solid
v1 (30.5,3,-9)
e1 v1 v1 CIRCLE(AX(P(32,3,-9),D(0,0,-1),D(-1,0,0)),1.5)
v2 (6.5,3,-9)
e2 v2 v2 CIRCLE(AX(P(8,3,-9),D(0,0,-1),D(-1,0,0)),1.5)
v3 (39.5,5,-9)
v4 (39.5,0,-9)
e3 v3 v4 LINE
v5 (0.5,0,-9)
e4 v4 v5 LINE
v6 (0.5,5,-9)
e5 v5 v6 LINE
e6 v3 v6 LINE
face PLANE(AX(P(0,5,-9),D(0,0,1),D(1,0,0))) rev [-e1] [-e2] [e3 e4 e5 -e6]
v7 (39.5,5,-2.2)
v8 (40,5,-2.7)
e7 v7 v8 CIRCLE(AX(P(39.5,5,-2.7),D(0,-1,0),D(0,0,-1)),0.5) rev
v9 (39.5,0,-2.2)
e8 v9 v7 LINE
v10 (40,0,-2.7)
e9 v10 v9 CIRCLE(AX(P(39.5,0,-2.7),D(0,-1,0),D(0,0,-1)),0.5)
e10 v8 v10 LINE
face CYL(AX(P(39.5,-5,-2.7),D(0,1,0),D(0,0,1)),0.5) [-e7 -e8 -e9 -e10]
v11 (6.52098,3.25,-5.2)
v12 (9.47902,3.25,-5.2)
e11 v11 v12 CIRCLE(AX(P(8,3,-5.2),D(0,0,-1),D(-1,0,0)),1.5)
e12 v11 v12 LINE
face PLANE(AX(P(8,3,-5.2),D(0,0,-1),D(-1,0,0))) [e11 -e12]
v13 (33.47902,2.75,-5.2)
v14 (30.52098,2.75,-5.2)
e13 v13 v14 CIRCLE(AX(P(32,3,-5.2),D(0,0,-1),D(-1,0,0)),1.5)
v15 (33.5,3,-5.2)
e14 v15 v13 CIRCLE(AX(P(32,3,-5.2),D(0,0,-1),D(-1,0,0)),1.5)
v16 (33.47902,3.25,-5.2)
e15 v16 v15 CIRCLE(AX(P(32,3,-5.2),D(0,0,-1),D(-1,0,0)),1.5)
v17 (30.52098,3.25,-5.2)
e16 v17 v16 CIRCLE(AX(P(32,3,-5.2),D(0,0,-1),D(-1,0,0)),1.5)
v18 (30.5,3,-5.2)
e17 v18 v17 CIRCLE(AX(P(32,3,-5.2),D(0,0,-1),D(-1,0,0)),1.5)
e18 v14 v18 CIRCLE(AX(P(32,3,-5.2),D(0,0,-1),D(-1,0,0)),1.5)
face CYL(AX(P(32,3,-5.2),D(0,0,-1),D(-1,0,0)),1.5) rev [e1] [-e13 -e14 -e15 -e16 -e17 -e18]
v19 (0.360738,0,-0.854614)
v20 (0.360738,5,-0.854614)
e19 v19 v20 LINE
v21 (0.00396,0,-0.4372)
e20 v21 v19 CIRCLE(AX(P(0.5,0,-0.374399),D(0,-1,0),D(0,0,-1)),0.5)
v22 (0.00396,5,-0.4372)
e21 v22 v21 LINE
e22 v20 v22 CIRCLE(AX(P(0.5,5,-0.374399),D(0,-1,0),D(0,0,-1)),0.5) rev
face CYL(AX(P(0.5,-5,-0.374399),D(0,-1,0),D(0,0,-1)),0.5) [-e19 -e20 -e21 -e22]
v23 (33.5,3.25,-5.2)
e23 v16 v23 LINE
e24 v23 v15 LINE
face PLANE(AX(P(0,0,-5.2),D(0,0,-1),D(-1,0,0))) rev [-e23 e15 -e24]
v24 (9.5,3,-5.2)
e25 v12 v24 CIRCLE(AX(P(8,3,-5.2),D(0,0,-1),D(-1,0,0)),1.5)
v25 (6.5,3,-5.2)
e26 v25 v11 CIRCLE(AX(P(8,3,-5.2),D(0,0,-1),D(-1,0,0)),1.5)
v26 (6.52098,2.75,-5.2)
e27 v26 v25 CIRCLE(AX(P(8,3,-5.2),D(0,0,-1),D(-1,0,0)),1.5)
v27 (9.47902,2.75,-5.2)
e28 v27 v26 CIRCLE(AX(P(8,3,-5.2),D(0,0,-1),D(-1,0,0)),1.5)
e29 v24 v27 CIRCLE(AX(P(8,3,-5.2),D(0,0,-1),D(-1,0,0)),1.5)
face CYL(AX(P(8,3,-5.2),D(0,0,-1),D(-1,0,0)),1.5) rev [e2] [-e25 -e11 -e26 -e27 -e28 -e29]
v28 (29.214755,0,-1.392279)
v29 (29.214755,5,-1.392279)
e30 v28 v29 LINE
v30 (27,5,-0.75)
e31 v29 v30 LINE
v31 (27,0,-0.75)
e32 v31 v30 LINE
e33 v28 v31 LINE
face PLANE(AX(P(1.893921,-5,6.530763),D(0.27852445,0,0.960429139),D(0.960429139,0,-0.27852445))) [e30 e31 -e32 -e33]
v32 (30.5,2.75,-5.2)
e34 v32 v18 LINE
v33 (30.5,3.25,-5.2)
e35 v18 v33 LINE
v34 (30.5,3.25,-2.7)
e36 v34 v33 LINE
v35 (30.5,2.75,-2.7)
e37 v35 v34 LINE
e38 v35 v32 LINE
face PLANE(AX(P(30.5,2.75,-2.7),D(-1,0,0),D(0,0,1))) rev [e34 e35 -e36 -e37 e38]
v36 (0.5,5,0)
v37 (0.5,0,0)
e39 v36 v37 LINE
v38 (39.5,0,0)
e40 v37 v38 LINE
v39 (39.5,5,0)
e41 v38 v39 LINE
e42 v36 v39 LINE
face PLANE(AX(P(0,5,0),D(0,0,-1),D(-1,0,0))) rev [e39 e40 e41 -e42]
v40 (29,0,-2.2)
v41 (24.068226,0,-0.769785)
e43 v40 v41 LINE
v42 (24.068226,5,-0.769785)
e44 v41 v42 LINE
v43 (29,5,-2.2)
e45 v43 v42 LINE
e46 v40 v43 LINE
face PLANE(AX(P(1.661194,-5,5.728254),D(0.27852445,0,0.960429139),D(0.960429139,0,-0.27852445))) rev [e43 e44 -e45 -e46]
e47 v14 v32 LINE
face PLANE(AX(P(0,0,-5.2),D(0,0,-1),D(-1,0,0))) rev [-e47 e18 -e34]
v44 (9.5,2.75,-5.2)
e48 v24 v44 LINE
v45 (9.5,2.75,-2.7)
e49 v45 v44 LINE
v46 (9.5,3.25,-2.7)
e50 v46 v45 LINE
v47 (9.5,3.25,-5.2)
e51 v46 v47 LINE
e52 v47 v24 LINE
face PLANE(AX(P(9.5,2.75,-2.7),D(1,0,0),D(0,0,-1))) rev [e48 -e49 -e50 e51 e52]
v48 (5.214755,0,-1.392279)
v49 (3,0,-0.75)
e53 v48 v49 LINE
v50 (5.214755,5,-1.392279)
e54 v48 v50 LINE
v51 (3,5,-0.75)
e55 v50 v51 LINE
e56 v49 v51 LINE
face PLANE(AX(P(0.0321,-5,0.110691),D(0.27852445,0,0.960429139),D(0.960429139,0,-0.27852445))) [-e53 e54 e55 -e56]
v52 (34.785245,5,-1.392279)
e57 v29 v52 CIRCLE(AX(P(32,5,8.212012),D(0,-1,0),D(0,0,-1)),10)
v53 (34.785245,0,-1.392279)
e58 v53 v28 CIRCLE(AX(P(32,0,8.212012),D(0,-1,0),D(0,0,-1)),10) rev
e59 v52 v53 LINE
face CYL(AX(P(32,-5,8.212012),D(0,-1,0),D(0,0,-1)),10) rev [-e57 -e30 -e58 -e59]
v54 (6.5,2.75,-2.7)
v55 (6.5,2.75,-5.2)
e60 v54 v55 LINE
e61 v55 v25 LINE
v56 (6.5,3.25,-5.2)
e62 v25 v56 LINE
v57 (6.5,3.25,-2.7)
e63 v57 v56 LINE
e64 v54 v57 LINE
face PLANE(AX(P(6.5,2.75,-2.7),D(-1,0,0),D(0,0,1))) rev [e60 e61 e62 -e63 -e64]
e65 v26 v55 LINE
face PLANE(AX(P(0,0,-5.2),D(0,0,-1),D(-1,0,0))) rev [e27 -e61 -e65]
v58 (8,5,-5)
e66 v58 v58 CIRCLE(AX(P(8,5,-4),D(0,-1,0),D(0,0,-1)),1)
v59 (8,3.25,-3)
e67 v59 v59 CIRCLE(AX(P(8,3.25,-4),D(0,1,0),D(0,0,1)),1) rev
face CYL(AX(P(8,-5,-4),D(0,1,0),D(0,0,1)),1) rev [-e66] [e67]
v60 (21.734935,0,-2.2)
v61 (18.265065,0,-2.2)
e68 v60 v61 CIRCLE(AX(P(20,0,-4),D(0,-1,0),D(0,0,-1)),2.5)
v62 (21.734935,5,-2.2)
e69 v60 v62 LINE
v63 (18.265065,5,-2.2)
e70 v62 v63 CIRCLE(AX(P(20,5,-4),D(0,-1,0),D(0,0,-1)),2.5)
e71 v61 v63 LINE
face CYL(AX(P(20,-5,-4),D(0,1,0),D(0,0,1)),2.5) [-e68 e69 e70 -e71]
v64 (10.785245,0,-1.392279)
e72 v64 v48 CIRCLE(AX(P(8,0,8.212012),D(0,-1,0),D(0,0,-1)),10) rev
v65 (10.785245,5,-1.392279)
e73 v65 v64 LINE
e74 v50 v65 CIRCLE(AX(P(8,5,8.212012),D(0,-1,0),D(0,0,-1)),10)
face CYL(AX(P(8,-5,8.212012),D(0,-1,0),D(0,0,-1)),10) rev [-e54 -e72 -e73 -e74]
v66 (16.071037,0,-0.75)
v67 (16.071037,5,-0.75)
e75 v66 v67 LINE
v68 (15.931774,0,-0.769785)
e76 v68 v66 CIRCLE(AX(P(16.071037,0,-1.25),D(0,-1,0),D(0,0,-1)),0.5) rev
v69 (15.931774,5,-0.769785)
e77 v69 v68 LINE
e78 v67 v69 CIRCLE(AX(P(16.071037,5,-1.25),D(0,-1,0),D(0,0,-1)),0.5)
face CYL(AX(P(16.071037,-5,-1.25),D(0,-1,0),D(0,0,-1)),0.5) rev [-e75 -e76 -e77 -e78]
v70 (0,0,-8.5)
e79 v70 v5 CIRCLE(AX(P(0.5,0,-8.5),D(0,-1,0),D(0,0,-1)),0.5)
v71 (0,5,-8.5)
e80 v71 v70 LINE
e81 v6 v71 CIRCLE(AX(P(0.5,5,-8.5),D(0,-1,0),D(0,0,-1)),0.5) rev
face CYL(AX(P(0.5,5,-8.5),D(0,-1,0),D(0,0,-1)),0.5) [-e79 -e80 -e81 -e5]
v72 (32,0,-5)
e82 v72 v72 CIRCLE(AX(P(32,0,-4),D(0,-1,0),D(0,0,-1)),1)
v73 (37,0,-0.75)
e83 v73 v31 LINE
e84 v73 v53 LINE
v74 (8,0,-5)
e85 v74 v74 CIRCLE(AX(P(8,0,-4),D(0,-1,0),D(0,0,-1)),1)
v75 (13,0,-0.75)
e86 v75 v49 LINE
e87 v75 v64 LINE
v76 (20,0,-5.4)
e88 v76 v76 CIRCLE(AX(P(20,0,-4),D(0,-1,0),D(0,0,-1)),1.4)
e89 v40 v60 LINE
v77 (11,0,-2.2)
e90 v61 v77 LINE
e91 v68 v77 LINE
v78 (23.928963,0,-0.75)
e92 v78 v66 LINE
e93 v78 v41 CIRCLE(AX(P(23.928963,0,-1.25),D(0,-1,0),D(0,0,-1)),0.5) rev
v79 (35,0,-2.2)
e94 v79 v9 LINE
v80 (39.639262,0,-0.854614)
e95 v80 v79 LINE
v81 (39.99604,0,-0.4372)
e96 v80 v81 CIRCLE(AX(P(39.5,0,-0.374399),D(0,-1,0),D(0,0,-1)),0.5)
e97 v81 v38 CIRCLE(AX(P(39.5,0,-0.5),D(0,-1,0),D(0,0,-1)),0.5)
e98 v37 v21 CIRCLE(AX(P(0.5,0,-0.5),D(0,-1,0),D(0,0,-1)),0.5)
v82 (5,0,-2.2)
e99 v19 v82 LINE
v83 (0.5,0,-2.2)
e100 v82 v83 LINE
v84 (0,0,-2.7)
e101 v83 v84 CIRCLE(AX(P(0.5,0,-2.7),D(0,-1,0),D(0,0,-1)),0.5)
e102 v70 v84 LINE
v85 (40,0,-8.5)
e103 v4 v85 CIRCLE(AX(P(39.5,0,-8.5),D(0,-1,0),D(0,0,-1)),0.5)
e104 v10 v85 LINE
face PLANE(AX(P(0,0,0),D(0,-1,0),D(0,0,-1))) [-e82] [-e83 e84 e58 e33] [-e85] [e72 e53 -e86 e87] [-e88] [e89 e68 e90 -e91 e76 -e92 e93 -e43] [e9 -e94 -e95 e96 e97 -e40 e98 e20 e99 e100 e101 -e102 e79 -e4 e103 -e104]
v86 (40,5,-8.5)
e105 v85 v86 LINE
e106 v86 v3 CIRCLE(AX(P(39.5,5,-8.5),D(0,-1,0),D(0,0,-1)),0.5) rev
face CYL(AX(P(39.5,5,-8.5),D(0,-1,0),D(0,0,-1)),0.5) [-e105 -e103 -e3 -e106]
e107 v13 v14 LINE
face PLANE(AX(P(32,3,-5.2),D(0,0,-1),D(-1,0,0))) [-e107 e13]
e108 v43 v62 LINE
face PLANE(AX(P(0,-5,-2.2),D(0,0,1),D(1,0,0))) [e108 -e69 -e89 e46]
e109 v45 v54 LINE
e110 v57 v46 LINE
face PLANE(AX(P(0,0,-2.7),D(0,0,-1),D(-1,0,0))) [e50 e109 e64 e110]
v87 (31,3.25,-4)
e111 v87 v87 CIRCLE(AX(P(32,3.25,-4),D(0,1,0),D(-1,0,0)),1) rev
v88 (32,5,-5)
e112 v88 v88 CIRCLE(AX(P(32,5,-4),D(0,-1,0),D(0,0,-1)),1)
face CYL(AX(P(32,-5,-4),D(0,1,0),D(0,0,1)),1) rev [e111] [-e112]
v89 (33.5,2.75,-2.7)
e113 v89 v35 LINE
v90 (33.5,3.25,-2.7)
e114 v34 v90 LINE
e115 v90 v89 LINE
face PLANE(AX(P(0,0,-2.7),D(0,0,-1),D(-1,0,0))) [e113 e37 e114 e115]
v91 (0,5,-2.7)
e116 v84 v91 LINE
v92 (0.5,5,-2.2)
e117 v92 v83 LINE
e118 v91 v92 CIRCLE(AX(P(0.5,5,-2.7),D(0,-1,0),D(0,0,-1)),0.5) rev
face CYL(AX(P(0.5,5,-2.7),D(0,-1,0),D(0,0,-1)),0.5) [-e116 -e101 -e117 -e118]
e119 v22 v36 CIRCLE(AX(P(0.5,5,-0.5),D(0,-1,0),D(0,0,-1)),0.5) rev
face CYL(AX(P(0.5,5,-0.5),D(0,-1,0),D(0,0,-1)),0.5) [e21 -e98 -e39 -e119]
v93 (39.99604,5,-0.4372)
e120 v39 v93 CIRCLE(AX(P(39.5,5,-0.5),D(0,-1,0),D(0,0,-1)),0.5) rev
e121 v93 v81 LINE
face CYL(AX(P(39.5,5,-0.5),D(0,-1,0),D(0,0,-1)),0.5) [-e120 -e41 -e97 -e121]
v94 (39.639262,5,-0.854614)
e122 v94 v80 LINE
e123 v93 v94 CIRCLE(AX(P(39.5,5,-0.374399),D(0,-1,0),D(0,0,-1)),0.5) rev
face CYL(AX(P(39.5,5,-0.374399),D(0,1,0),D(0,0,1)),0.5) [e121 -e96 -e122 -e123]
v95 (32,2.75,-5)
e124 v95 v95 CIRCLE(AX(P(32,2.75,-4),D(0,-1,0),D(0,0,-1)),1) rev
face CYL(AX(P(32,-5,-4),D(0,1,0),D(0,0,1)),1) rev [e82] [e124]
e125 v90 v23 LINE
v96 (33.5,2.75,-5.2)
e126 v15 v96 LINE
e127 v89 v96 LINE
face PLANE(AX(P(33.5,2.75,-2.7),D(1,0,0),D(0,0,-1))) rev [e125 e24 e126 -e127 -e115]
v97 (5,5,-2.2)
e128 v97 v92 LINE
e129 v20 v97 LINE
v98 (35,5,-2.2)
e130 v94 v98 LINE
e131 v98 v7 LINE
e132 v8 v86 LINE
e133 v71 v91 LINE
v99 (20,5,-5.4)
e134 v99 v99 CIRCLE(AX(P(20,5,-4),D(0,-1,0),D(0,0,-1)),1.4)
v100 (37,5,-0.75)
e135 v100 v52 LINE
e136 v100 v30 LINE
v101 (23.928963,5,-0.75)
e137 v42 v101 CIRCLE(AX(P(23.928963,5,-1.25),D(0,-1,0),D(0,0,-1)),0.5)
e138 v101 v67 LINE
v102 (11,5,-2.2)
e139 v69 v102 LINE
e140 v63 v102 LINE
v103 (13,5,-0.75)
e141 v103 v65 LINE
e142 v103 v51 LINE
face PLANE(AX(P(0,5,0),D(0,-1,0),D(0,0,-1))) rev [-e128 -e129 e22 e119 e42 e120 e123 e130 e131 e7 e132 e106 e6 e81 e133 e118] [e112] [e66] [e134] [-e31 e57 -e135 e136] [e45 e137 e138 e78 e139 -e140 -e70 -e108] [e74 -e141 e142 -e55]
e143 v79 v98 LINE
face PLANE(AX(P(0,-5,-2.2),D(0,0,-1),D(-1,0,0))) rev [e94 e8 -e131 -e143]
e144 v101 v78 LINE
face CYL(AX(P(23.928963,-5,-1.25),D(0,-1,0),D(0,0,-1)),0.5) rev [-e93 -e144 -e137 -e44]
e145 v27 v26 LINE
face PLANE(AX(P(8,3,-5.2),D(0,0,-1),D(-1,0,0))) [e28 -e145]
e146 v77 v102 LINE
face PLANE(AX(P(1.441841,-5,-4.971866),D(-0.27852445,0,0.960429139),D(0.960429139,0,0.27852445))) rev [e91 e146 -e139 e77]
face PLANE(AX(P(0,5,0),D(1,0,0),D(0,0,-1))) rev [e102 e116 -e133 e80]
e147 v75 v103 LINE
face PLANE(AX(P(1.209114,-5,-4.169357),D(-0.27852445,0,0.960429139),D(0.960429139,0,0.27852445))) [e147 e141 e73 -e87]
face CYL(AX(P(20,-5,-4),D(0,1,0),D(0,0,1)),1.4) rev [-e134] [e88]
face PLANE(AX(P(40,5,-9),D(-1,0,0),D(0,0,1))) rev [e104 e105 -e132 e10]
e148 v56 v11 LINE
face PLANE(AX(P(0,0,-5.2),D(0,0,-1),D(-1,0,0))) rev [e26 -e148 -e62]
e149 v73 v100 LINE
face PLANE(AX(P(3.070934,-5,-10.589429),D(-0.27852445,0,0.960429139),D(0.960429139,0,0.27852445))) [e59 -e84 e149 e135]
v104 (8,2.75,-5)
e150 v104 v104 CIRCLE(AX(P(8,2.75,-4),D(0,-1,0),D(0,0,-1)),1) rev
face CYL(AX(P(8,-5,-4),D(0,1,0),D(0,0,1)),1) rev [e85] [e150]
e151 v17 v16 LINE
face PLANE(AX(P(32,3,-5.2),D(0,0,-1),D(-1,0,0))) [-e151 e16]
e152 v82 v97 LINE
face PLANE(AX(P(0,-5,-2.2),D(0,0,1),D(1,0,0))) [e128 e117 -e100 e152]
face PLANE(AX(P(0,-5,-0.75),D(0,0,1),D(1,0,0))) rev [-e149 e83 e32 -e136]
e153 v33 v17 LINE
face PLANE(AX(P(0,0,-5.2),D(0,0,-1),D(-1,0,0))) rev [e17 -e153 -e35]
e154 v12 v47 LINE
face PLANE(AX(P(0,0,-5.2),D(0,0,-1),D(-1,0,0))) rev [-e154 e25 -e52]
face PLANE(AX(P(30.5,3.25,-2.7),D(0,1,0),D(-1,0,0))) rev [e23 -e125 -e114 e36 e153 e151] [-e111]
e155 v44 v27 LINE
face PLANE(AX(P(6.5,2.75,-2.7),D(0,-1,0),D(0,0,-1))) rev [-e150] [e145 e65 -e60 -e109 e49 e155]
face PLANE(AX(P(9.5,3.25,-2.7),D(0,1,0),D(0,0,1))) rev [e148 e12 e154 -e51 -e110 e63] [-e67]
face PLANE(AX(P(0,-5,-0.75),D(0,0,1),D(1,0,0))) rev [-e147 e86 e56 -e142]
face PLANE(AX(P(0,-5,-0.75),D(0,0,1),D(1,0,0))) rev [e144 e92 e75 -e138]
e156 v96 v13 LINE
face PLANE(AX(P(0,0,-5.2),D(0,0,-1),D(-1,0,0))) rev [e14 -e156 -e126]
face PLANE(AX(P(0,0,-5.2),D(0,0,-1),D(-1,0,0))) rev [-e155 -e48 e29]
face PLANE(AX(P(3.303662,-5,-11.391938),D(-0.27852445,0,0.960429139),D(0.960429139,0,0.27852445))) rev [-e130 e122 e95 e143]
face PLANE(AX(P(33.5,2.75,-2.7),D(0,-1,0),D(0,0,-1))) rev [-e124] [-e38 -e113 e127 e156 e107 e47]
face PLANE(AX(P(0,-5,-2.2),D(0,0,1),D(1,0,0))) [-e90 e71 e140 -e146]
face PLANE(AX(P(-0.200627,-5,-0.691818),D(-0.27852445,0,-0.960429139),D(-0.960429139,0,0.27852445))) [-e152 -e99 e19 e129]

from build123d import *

# Parameters (mm, degrees)
SKETCH1_W               = 40
SKETCH1_H               = 9
BOSS_EXTRUDE1_DEPTH     = 5
CUT_EXTRUDE1_DEPTH      = 5
CUT_EXTRUDE1_DEPTH_BACK = 10
SKETCH2_R               = 1
SKETCH2_R_2             = 1.4
FILLET1_R               = 10
FILLET2_R               = 0.5
SKETCH3_R               = 1.5
CUT_EXTRUDE6_DEPTH      = 3.8
SKETCH4_W               = 3
SKETCH4_H               = 0.5
CUT_EXTRUDE7_DEPTH      = 2.5


with BuildPart() as part:
    # Sketch1 → Boss-Extrude1 (new body)
    with BuildSketch(Plane(origin=(0, 0, 0), x_dir=(1, 0, 0), z_dir=(0, 1, 0))):
        with Locations((20, 4.5)):
            Rectangle(SKETCH1_W, SKETCH1_H)
    extrude(amount=BOSS_EXTRUDE1_DEPTH)

    # Sketch2 → Cut-Extrude1 (cut, two sides: drawn at the far end of the back side and taken through both)
    with BuildSketch(Plane(origin=(0, 5, 0), x_dir=(1, 0, 0), z_dir=(0, 1, 0)).offset(-CUT_EXTRUDE1_DEPTH_BACK)):
        with Locations(Location((8, 4, 0), (0, 0, 90))):
            Circle(SKETCH2_R)
        with Locations(Location((32, 4, 0), (0, 0, 90))):
            Circle(SKETCH2_R)
        with Locations(Location((20, 4, 0), (0, 0, 90))):
            Circle(SKETCH2_R_2)
        with BuildLine():
            ThreePointArc((21.734935157, 2.2), (20, 1.5), (18.265064843, 2.2))
            Line((18.265064843, 2.2), (11, 2.2))
            Line((11, 2.2), (16, 0.75))
            Line((16, 0.75), (24, 0.75))
            Line((24, 0.75), (29, 2.2))
            Line((29, 2.2), (21.734935157, 2.2))
        make_face()
        Polygon((13, 0.75), (8, 2.2), (3, 0.75), align=None)
        Polygon((37, 0.75), (32, 2.2), (27, 0.75), align=None)
        Polygon((0, 0.75), (5, 2.2), (0, 2.2), align=None)
        Polygon((40, 2.2), (35, 2.2), (40, 0.75), align=None)
    extrude(amount=CUT_EXTRUDE1_DEPTH + CUT_EXTRUDE1_DEPTH_BACK, mode=Mode.SUBTRACT)

    # Fillet1
    fillet1_edges = [part.edges().sort_by_distance(p)[0] for p in [
        (32, 2.5, -2.2),
        (8, 2.5, -2.2),
    ]]
    fillet(fillet1_edges, radius=FILLET1_R)

    # Fillet2
    # the kernel refuses this fillet: 0.5 mm, written as the material it adds along each edge
    with BuildSketch(Plane(origin=(24, 5, -0.75), x_dir=(0.9604291387787307, 0, -0.27852445024583705), z_dir=(0, -1, 0))) as fillet2_piece_1:
        with BuildLine():
            CenterArc((FILLET2_R * 0.142073204655, -FILLET2_R), FILLET2_R, 90, 16.172159016)
            Line((-FILLET2_R * 0.136451245591, -FILLET2_R * 0.0395708612213), (0, 0))
            Line((0, 0), (FILLET2_R * 0.142073204655, 0))
        make_face()
    extrude(amount=5)
    with BuildSketch(Plane(origin=(16, 0, -0.75), x_dir=(1, 0, 0), z_dir=(0, 1, 0))) as fillet2_piece_2:
        with BuildLine():
            CenterArc((FILLET2_R * 0.142073204655, FILLET2_R), FILLET2_R, 253.827840984, 16.172159016)
            Line((-FILLET2_R * 0.136451245591, FILLET2_R * 0.0395708612213), (0, 0))
            Line((0, 0), (FILLET2_R * 0.142073204655, 0))
        make_face()
    extrude(amount=5)
    # the kernel refuses this fillet: 0.5 mm, written as the material it takes off along each edge
    with BuildSketch(Plane(origin=(0, 5.939001537, -0.75), x_dir=(0.960429138778732, 0, -0.2785244502458324), z_dir=(0, -1, 0)), Plane(origin=(40, 5.939001537, -0.75), x_dir=(0, 0, 1), z_dir=(0, -1, 0))) as fillet2_2_piece_1:
        with BuildLine():
            CenterArc((FILLET2_R * 0.75120122935, FILLET2_R), FILLET2_R, 196.172159016, 73.827840984)
            Line((-FILLET2_R * 0.209227909429, FILLET2_R * 0.721475549754), (0, 0))
            Line((0, 0), (FILLET2_R * 0.75120122935, 0))
        make_face()
    extrude(amount=6.878003073, mode=Mode.SUBTRACT)
    with BuildSketch(Plane(origin=(0, 6.25, -2.2), x_dir=(0, 0, -1), z_dir=(0, -1, 0)), Plane(origin=(40, 6.25, -2.2), x_dir=(-1, 0, 0), z_dir=(0, -1, 0)), Plane(origin=(0, -1.25, 0), x_dir=(1, 0, 0), z_dir=(0, 1, 0))) as fillet2_2_piece_2:
        with BuildLine():
            CenterArc((FILLET2_R, FILLET2_R), FILLET2_R, 180, 90)
            Line((0, FILLET2_R), (0, 0))
            Line((0, 0), (FILLET2_R, 0))
        make_face()
    extrude(amount=7.5, mode=Mode.SUBTRACT)
    with BuildSketch(Plane(origin=(0, -1.25, -9), x_dir=(1, 0, 0), z_dir=(0, 1, 0)), Plane(origin=(40, -1.25, -9), x_dir=(0, 0, 1), z_dir=(0, 1, 0)), Plane(origin=(40, -1.25, 0), x_dir=(-1, 0, 0), z_dir=(0, 1, 0))) as fillet2_2_piece_3:
        with BuildLine():
            CenterArc((FILLET2_R, -FILLET2_R), FILLET2_R, 90, 90)
            Line((0, -FILLET2_R), (0, 0))
            Line((0, 0), (FILLET2_R, 0))
        make_face()
    extrude(amount=7.5, mode=Mode.SUBTRACT)

    # Sketch3 → Cut-Extrude6 (cut)
    with BuildSketch(Plane(origin=(0, 0, -9), x_dir=(-1, 0, 0), z_dir=(0, 0, -1))):
        with Locations((-32, 3)):
            Circle(SKETCH3_R)
        with Locations((-8, 3)):
            Circle(SKETCH3_R)
    extrude(amount=-CUT_EXTRUDE6_DEPTH, mode=Mode.SUBTRACT)

    # Sketch4 → Cut-Extrude7 (cut)
    with BuildSketch(Plane(origin=(0, 0, -5.2), x_dir=(-1, 0, 0), z_dir=(0, 0, -1))):
        with Locations((-32, 3)):
            Rectangle(SKETCH4_W, SKETCH4_H)
        with Locations((-8, 3)):
            Rectangle(SKETCH4_W, SKETCH4_H)
    extrude(amount=-CUT_EXTRUDE7_DEPTH, mode=Mode.SUBTRACT)


solid = part.part
